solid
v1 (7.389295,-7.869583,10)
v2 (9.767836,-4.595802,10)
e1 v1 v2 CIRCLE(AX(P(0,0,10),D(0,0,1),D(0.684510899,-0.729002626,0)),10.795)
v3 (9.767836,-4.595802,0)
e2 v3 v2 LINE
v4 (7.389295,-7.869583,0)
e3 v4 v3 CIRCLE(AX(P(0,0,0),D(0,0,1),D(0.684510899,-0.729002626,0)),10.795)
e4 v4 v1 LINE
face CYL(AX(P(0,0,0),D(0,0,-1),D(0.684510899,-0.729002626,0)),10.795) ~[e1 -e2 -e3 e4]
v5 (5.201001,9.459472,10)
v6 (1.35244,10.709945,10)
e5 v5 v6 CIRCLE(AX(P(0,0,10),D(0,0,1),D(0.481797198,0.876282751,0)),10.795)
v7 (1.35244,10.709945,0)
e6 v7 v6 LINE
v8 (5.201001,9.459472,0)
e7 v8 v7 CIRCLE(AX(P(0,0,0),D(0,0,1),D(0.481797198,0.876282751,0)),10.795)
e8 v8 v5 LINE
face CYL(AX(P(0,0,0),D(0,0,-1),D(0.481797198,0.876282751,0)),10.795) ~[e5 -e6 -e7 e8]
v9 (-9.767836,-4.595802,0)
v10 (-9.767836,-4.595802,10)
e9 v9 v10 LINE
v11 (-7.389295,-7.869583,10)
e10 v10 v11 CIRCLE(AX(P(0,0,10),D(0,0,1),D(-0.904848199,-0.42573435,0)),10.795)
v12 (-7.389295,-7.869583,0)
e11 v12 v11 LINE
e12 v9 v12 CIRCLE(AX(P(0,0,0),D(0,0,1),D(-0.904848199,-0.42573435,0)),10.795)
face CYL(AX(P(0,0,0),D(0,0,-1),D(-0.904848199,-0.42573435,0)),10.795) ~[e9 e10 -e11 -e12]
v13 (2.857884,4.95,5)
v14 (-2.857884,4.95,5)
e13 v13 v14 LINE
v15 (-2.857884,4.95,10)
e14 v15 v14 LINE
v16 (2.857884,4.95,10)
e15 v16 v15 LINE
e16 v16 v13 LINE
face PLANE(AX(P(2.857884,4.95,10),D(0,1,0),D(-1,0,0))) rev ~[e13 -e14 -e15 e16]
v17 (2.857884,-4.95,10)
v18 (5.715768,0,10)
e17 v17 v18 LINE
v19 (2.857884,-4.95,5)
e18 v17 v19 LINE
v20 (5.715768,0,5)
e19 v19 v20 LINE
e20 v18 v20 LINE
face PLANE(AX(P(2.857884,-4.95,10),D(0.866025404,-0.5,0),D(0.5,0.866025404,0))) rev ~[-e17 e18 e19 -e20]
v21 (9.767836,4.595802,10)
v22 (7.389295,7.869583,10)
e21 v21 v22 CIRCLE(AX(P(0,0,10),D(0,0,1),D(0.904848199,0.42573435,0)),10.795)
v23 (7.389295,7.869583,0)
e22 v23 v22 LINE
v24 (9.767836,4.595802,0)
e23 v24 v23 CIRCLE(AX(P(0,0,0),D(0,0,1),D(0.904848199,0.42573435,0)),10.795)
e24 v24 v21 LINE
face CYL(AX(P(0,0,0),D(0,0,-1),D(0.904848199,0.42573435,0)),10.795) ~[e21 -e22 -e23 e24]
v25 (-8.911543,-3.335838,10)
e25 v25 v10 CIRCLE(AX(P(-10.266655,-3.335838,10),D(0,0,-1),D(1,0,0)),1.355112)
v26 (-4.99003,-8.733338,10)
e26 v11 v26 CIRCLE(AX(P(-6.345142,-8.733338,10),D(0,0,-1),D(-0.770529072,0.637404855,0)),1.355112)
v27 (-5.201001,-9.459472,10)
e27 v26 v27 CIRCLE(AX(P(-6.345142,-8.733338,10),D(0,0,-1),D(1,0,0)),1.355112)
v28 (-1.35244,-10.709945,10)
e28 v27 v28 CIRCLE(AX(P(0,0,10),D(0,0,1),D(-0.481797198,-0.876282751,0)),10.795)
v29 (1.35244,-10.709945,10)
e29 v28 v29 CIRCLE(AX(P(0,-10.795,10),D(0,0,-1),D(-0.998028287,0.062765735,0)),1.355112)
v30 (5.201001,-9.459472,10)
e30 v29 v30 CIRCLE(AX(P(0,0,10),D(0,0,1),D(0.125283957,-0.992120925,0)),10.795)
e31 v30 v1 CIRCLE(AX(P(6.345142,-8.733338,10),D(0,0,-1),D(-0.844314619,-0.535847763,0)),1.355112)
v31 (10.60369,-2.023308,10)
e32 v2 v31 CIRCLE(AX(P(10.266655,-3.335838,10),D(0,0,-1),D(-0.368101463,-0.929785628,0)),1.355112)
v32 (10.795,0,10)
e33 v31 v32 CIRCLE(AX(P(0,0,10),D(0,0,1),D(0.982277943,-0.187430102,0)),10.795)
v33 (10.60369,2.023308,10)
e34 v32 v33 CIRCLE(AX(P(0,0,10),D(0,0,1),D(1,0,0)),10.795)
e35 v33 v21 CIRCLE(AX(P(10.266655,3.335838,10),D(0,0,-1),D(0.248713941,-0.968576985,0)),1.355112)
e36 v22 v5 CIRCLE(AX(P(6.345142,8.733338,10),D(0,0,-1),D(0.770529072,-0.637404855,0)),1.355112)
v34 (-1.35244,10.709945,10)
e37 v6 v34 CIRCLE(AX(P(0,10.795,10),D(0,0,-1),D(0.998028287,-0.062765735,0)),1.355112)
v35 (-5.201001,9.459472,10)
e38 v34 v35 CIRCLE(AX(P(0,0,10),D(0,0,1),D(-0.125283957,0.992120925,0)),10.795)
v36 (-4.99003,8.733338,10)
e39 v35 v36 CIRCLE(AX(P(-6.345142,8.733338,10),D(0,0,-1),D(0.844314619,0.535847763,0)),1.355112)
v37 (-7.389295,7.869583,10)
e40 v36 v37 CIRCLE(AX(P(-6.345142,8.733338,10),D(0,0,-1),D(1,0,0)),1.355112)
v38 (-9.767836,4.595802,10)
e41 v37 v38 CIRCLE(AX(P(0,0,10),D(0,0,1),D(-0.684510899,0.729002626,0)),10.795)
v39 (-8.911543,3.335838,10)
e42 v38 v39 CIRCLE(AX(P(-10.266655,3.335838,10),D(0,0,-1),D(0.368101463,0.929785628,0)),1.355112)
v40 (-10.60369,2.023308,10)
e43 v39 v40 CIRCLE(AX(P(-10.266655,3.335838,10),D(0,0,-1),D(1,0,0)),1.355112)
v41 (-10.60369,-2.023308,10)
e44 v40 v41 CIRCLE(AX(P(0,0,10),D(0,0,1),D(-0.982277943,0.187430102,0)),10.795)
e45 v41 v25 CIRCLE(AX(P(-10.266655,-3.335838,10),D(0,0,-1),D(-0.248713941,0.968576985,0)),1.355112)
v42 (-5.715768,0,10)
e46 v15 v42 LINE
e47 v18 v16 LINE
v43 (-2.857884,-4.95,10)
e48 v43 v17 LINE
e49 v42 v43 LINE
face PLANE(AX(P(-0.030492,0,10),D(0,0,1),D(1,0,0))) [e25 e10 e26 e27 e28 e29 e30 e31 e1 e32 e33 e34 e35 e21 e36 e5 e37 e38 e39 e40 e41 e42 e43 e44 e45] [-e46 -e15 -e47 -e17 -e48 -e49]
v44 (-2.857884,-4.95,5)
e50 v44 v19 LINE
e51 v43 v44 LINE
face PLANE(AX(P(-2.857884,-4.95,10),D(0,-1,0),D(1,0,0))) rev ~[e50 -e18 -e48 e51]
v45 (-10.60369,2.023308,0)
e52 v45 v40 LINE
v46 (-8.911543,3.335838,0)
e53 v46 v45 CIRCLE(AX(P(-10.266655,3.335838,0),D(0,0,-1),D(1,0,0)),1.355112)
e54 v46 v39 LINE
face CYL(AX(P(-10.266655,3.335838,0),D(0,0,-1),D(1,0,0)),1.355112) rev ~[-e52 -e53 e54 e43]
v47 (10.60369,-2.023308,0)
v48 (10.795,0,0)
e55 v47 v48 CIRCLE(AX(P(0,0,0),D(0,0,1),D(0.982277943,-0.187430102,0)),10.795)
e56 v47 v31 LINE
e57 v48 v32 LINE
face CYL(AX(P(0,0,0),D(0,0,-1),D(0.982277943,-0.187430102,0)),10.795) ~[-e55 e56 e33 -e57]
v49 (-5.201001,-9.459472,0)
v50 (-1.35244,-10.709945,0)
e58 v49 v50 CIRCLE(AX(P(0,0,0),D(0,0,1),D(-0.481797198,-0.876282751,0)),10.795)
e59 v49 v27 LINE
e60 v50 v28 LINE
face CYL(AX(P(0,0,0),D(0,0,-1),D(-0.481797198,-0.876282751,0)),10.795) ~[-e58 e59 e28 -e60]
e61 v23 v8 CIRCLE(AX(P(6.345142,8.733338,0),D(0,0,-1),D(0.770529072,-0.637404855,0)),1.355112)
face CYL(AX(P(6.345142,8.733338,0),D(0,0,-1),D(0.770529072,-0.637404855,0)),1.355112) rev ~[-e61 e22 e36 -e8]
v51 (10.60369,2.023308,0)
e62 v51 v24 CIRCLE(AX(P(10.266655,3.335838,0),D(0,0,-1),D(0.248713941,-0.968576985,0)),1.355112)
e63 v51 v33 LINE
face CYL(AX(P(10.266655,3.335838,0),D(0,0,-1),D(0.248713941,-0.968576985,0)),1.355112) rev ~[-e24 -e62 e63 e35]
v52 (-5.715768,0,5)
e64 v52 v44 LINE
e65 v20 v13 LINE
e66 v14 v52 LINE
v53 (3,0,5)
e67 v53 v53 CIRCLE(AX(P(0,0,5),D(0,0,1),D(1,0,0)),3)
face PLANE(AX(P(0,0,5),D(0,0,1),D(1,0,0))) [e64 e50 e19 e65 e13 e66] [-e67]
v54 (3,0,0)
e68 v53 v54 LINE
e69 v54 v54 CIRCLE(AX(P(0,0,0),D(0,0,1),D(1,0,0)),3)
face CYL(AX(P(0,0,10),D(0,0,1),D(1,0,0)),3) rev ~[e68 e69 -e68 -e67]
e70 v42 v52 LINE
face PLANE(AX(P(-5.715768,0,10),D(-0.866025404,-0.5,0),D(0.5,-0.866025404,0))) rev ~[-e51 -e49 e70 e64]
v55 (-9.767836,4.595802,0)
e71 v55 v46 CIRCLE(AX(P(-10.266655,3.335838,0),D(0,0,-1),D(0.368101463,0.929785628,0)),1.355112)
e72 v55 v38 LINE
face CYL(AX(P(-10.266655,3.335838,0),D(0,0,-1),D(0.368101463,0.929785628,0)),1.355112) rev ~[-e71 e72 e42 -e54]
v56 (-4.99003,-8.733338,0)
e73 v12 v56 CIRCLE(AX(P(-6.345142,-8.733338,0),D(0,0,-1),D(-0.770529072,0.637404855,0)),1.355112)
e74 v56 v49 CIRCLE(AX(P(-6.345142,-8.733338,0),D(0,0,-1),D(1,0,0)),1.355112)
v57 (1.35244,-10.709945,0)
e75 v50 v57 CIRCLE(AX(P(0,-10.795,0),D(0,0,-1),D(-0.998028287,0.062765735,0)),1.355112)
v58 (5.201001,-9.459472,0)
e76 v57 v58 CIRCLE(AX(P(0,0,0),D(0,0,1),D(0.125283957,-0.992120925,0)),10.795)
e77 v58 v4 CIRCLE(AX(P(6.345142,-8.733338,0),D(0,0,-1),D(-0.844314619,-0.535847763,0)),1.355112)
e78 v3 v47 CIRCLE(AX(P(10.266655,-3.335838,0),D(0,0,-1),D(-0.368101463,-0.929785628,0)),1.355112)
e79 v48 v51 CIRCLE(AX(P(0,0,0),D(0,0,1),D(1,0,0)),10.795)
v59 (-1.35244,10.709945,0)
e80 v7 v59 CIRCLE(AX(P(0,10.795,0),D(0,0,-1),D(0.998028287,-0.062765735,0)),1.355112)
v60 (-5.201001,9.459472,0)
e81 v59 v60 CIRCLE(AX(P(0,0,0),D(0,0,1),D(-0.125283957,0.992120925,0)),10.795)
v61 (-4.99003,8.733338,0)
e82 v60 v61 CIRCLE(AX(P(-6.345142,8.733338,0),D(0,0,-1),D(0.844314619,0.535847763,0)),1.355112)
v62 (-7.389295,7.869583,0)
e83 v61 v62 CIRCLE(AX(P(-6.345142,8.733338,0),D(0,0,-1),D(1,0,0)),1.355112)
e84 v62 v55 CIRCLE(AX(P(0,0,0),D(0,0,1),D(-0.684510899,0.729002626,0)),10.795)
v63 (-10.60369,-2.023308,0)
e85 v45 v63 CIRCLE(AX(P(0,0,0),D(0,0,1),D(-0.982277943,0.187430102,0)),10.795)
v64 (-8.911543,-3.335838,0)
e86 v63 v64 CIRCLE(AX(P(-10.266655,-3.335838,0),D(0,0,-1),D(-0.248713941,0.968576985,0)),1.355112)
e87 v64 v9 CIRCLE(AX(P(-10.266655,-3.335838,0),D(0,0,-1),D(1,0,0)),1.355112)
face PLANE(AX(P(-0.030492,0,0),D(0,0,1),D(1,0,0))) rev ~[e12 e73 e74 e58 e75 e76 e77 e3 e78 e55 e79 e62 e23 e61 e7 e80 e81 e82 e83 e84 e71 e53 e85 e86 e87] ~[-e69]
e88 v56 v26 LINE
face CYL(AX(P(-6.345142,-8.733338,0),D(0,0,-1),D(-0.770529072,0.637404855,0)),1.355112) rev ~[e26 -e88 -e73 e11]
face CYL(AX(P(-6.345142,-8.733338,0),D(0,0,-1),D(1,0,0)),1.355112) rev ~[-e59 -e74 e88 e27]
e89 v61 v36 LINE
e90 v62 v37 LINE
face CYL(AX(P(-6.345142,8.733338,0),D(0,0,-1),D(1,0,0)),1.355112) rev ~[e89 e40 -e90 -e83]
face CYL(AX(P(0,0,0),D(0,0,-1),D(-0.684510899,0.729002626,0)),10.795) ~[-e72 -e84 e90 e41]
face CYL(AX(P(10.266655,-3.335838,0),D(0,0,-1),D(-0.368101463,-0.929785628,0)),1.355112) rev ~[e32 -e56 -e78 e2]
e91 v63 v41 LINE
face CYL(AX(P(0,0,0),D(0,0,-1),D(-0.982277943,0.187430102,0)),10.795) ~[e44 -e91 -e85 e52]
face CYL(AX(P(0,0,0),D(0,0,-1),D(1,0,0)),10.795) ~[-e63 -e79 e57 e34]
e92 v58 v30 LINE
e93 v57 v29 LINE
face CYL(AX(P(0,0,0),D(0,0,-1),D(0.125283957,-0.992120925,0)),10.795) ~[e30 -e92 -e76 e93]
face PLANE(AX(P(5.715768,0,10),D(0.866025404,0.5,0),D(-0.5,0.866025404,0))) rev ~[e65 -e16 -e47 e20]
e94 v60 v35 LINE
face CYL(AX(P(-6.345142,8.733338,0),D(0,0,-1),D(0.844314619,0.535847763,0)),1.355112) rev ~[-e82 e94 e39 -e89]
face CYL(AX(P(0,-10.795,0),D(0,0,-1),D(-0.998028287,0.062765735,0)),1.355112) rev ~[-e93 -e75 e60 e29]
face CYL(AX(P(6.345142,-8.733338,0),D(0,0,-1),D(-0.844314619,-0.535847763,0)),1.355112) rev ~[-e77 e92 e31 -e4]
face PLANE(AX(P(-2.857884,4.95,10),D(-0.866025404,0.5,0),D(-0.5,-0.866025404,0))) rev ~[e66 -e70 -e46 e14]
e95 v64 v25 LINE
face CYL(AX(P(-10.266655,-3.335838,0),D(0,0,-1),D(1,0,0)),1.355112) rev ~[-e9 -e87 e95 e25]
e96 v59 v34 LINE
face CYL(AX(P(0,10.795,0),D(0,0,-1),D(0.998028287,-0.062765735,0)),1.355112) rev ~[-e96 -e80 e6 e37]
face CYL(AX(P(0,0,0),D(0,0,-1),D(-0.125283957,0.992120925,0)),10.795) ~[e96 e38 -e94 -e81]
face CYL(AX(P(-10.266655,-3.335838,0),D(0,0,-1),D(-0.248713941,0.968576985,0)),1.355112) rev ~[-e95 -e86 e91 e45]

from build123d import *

# Parameters (mm, degrees)
F1_DEPTH = 10
F2_R     = 3
F3_DEPTH = 10.001
F4_R     = 3
F5_DEPTH = 5


with BuildPart() as f1:
    # F0 (on Top) → F1 (new body)
    with BuildSketch(Plane.XY):
        with BuildLine():
            ThreePointArc((10.6036903919, -2.023307953), (10.747066176, -1.0161661329), (10.795, 0))
            ThreePointArc((10.795, 0), (10.747066176, 1.0161661329), (10.6036903919, 2.023307953))
            ThreePointArc((10.6036903919, 2.023307953), (8.9778667931, 2.9170857512), (9.7678363058, 4.5958023134))
            ThreePointArc((9.7678363058, 4.5958023134), (8.7333384543, 6.3451417985), (7.3892951545, 7.8695833511))
            ThreePointArc((7.3892951545, 7.8695833511), (5.5486268246, 7.6370296448), (5.2010007473, 9.4594723017))
            ThreePointArc((5.2010007473, 9.4594723017), (3.3358384543, 10.2666550934), (1.352440321, 10.7099453863))
            ThreePointArc((1.352440321, 10.7099453863), (0, 9.4398877872), (-1.352440321, 10.7099453863))
            ThreePointArc((-1.352440321, 10.7099453863), (-3.3358384543, 10.2666550934), (-5.2010007473, 9.4594723017))
            ThreePointArc((-5.2010007473, 9.4594723017), (-5.0438407916, 9.1114188675), (-4.9900295857, 8.7333384543))
            ThreePointArc((-4.9900295857, 8.7333384543), (-5.8861297374, 7.4583337339), (-7.3892951545, 7.8695833511))
            ThreePointArc((-7.3892951545, 7.8695833511), (-8.7333384543, 6.3451417985), (-9.7678363058, 4.5958023134))
            ThreePointArc((-9.7678363058, 4.5958023134), (-9.1458775641, 4.0975384208), (-8.9115428806, 3.3358384543))
            ThreePointArc((-8.9115428806, 3.3358384543), (-9.4361105551, 2.2650794341), (-10.6036903919, 2.023307953))
            ThreePointArc((-10.6036903919, 2.023307953), (-10.795, 0), (-10.6036903919, -2.023307953))
            ThreePointArc((-10.6036903919, -2.023307953), (-9.4361105551, -2.2650794341), (-8.9115428806, -3.3358384543))
            ThreePointArc((-8.9115428806, -3.3358384543), (-9.1458775641, -4.0975384208), (-9.7678363058, -4.5958023134))
            ThreePointArc((-9.7678363058, -4.5958023134), (-8.7333384543, -6.3451417985), (-7.3892951545, -7.8695833511))
            ThreePointArc((-7.3892951545, -7.8695833511), (-5.8861297374, -7.4583337339), (-4.9900295857, -8.7333384543))
            ThreePointArc((-4.9900295857, -8.7333384543), (-5.0438407916, -9.1114188675), (-5.2010007473, -9.4594723017))
            ThreePointArc((-5.2010007473, -9.4594723017), (-3.3358384543, -10.2666550934), (-1.352440321, -10.7099453863))
            ThreePointArc((-1.352440321, -10.7099453863), (0, -9.4398877872), (1.352440321, -10.7099453863))
            ThreePointArc((1.352440321, -10.7099453863), (3.3358384543, -10.2666550934), (5.2010007473, -9.4594723017))
            ThreePointArc((5.2010007473, -9.4594723017), (5.5486268246, -7.6370296448), (7.3892951545, -7.8695833511))
            ThreePointArc((7.3892951545, -7.8695833511), (8.7333384543, -6.3451417985), (9.7678363058, -4.5958023134))
            ThreePointArc((9.7678363058, -4.5958023134), (8.9778667931, -2.9170857512), (10.6036903919, -2.023307953))
        make_face()
    extrude(amount=F1_DEPTH)

    # F2 (on face) → F3 (cut, through all)
    with BuildSketch(Plane.XY.offset(10)):
        Circle(F2_R)
    extrude(amount=-F3_DEPTH, mode=Mode.SUBTRACT)

    # F4 (on face) → F5 (cut)
    with BuildSketch(Plane.XY.offset(10)):
        Polygon((2.8578838325, -4.95), (5.715767665, 0), (2.8578838325, 4.95), (-2.8578838325, 4.95), (-5.715767665, 0), (-2.8578838325, -4.95), align=None)
        Circle(F4_R, mode=Mode.SUBTRACT)
    extrude(amount=-F5_DEPTH, mode=Mode.SUBTRACT)


solid = f1.part
